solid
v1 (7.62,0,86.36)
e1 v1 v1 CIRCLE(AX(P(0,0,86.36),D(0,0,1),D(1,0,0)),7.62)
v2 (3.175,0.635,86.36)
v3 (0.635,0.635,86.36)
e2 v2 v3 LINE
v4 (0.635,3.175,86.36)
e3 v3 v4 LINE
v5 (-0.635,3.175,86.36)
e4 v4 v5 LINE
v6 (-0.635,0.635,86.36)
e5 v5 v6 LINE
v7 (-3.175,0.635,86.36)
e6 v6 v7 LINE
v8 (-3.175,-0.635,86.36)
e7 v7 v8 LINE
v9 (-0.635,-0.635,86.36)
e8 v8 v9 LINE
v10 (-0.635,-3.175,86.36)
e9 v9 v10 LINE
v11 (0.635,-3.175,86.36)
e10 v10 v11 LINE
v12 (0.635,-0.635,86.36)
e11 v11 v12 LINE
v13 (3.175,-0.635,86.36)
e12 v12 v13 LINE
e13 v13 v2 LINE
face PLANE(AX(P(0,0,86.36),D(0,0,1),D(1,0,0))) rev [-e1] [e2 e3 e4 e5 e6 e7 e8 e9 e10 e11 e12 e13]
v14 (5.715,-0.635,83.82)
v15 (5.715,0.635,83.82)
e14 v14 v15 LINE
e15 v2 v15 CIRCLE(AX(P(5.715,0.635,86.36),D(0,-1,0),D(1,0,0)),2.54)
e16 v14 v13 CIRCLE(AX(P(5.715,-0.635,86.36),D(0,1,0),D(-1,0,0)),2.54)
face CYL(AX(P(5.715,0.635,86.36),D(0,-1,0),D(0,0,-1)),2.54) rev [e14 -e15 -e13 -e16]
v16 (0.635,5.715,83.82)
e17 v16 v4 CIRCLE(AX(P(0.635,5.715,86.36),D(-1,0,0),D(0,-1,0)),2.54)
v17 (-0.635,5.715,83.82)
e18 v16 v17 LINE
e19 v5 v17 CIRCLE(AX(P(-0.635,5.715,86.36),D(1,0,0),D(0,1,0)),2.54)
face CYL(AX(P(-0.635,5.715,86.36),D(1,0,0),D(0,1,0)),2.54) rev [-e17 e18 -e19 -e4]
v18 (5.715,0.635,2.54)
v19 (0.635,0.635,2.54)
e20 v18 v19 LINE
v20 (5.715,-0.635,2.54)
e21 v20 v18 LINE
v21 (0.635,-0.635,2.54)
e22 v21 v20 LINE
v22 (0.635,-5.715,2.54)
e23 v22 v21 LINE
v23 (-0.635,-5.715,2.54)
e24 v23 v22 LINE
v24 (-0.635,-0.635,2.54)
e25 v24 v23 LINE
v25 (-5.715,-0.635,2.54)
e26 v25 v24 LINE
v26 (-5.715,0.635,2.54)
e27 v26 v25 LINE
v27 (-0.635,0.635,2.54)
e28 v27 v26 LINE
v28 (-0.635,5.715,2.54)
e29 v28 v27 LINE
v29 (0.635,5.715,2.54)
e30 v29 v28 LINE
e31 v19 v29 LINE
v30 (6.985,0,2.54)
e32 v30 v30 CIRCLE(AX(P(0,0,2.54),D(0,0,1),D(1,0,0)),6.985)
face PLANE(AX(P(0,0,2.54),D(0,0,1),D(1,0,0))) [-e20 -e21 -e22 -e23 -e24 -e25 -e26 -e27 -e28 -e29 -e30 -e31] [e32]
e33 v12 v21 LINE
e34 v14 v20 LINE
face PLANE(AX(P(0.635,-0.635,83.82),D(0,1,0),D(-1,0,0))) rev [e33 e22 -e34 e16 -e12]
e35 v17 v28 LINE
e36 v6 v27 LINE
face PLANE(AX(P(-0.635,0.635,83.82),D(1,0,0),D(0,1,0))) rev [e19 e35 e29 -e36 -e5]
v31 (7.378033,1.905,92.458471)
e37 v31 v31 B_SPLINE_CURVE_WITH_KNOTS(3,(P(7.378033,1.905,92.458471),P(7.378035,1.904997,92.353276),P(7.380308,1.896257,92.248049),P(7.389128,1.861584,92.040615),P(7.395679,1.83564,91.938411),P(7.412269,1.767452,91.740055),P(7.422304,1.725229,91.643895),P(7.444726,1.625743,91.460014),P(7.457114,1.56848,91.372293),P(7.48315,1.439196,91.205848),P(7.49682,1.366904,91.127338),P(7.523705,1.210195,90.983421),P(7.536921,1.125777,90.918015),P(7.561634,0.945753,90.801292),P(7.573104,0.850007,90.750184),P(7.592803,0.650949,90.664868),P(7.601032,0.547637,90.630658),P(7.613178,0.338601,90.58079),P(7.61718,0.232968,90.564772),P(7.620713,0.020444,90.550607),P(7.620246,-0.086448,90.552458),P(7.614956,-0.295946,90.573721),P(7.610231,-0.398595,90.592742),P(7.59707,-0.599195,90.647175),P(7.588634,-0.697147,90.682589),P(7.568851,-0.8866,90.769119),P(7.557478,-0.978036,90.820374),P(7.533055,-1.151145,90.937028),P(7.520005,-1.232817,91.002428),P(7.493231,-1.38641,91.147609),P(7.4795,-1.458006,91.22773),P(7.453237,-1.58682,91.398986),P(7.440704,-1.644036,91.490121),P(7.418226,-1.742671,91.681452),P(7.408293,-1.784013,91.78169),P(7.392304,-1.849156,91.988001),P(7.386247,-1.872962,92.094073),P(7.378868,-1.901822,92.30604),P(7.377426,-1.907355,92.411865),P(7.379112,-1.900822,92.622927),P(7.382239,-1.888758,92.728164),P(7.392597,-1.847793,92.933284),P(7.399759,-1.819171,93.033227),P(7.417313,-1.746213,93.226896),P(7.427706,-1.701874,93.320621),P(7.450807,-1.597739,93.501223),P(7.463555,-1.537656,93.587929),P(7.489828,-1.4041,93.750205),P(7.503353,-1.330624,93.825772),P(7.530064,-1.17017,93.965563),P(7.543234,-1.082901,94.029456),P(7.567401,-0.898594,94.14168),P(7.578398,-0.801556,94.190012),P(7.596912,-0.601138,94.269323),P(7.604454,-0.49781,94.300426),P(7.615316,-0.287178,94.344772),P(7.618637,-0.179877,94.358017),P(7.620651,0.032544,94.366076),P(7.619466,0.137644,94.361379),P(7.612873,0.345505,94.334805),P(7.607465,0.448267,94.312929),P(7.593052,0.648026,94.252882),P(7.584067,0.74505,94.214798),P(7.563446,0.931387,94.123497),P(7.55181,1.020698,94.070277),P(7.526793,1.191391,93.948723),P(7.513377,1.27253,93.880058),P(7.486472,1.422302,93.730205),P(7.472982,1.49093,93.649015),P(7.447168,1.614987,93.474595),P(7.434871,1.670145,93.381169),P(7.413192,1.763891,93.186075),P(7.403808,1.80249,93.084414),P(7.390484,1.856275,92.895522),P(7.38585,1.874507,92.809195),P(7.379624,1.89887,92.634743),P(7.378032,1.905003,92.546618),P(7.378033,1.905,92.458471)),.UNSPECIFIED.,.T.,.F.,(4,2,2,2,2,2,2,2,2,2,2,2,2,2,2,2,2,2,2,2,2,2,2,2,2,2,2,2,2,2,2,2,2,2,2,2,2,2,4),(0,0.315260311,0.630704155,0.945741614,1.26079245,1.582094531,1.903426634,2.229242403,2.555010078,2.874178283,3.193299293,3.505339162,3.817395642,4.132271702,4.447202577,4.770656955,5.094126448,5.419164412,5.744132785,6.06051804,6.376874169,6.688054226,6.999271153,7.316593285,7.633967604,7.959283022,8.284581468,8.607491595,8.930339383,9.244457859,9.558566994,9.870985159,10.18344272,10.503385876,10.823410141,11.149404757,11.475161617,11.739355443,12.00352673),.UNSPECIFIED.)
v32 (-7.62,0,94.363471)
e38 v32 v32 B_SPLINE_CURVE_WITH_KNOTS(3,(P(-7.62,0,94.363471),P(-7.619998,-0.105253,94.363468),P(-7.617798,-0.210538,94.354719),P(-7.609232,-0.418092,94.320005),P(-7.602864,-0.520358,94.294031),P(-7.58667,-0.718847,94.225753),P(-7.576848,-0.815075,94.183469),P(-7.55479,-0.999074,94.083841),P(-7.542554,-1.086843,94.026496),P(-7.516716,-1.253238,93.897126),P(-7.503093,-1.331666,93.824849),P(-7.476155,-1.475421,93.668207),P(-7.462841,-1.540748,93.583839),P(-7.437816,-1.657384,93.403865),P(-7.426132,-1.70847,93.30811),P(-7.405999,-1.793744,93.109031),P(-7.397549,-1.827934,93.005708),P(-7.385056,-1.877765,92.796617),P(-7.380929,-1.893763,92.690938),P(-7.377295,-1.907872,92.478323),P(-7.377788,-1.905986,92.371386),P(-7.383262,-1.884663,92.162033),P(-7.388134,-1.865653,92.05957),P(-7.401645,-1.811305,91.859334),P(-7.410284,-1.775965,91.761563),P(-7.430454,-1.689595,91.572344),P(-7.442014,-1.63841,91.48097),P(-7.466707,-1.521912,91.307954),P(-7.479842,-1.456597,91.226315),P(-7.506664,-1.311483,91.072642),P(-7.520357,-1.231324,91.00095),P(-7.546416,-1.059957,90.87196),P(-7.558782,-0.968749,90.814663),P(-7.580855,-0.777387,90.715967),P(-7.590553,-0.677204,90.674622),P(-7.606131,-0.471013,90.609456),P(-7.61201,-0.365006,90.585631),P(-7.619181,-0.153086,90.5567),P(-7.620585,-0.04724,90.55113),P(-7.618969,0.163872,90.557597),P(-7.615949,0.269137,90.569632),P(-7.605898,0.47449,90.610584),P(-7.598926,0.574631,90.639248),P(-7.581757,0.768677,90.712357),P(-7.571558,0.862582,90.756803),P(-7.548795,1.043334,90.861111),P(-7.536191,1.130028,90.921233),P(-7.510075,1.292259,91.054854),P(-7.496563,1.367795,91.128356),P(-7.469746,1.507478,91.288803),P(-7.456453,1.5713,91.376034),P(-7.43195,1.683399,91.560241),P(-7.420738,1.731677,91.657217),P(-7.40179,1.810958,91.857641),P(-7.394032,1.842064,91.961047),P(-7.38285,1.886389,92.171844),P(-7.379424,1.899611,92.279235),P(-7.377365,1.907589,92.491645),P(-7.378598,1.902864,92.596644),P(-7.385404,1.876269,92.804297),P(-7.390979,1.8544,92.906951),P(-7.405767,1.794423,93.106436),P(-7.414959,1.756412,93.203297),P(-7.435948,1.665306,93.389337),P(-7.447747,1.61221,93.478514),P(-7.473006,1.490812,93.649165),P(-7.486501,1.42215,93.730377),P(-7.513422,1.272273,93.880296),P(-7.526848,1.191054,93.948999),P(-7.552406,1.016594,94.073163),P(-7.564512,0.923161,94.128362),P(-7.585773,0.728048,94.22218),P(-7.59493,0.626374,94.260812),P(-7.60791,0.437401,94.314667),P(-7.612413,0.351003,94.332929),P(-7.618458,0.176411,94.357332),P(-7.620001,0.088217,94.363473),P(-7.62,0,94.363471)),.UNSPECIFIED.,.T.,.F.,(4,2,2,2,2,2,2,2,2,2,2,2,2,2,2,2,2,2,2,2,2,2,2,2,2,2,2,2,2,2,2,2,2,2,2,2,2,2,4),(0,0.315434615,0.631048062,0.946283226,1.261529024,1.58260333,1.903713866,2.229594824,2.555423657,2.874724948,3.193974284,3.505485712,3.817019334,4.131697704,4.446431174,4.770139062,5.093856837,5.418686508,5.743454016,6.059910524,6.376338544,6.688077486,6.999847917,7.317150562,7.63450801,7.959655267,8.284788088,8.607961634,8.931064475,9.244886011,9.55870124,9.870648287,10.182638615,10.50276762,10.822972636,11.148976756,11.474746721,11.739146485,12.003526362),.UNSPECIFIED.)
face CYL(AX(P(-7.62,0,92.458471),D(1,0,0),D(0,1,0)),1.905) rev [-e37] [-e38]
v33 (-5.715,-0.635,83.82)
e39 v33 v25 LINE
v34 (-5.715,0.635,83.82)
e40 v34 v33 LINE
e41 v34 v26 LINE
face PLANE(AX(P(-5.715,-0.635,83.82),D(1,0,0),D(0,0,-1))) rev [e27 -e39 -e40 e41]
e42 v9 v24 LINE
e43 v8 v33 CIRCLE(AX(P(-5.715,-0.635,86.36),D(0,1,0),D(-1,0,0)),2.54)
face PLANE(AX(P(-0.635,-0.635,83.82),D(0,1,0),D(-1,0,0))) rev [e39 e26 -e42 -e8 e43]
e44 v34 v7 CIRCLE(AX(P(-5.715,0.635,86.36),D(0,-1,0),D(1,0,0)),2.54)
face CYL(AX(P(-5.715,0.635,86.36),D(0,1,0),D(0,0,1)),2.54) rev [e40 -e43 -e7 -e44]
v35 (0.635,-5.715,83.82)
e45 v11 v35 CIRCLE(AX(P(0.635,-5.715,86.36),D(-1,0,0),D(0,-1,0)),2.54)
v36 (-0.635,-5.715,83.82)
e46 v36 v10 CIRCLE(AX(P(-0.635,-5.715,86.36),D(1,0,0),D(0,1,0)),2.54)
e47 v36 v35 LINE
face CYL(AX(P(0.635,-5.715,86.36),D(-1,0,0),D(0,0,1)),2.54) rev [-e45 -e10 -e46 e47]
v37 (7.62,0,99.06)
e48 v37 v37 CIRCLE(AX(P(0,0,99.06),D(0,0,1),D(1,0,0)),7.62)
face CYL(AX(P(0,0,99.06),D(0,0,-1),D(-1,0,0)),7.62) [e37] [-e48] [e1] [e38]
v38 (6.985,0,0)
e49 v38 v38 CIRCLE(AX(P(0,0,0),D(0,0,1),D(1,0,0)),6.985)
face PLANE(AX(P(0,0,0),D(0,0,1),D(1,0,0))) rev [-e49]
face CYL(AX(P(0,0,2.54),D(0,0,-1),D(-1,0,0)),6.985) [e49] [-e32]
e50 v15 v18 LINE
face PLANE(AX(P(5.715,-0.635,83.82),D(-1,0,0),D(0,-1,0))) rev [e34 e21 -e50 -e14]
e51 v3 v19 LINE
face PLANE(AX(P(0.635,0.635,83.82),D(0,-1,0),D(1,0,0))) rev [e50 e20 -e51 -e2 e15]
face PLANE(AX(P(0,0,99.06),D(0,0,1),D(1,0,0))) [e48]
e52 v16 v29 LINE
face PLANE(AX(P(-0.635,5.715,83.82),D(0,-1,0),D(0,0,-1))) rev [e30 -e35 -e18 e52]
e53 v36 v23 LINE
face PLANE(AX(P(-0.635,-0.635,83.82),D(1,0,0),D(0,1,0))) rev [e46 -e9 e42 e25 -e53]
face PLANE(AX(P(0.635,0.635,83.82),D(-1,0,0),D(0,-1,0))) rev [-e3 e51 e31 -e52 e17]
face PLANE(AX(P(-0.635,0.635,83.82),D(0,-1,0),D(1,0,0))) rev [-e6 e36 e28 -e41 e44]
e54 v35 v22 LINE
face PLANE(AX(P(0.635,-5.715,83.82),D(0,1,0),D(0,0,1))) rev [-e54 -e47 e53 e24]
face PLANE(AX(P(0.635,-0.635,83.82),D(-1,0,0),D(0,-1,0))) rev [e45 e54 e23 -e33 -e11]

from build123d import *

# Parameters (mm, degrees)
SKETCH1_R               = 6.985
BOSS_EXTRUDE1_DEPTH     = 2.54
BOSS_EXTRUDE2_DEPTH     = 81.28
BOSS_EXTRUDE3_DEPTH     = 2.54
FILLET1_R               = 2.54
SKETCH4_R               = 7.62
BOSS_EXTRUDE4_DEPTH     = 12.7
CUT_EXTRUDE1_DEPTH      = 101.243554531
CUT_EXTRUDE1_DEPTH_BACK = 101.243554531
SKETCH5_R               = 1.905


with BuildPart() as part:
    # Sketch1 → Boss-Extrude1 (new body)
    with BuildSketch(Plane.XY):
        Circle(SKETCH1_R)
    extrude(amount=BOSS_EXTRUDE1_DEPTH)

    # Sketch2 → Boss-Extrude2 (add)
    with BuildSketch(Plane.XY.offset(2.54)):
        Polygon((-0.635, -0.635), (-5.715, -0.635), (-5.715, 0.635), (-0.635, 0.635), (-0.635, 5.715), (0.635, 5.715), (0.635, 0.635), (5.715, 0.635), (5.715, -0.635), (0.635, -0.635), (0.635, -5.715), (-0.635, -5.715), align=None)
    extrude(amount=BOSS_EXTRUDE2_DEPTH)

    # Sketch3 → Boss-Extrude3 (add)
    with BuildSketch(Plane.XY.offset(83.82)):
        Polygon((-3.175, 0.635), (-0.635, 0.635), (-0.635, 3.175), (0.635, 3.175), (0.635, 0.635), (3.175, 0.635), (3.175, -0.635), (0.635, -0.635), (0.635, -3.175), (-0.635, -3.175), (-0.635, -0.635), (-3.175, -0.635), align=None)
    extrude(amount=BOSS_EXTRUDE3_DEPTH)

    # Fillet1
    fillet1_edges = [part.edges().sort_by_distance(p)[0] for p in [
        (0, -3.175, 83.82),
        (3.175, 0, 83.82),
        (0, 3.175, 83.82),
        (-3.175, 0, 83.82),
    ]]
    fillet(fillet1_edges, radius=FILLET1_R - 0.0001)  # a hair under: the kernel refuses the full size

    # Sketch4 → Boss-Extrude4 (add)
    with BuildSketch(Plane.XY.offset(86.36)):
        Circle(SKETCH4_R)
    extrude(amount=BOSS_EXTRUDE4_DEPTH)

    # Sketch5 → Cut-Extrude1 (cut, two sides: drawn at the far end of the back side and taken through both)
    with BuildSketch(Plane(origin=(5.715, 0, 0), x_dir=(0, 0, -1), z_dir=(1, 0, 0)).offset(-CUT_EXTRUDE1_DEPTH_BACK)):
        with Locations(Location((-92.458470984, 0, 0), (0, 0, 180.000000004))):
            Circle(SKETCH5_R)
    extrude(amount=CUT_EXTRUDE1_DEPTH + CUT_EXTRUDE1_DEPTH_BACK, mode=Mode.SUBTRACT)


solid = part.part
